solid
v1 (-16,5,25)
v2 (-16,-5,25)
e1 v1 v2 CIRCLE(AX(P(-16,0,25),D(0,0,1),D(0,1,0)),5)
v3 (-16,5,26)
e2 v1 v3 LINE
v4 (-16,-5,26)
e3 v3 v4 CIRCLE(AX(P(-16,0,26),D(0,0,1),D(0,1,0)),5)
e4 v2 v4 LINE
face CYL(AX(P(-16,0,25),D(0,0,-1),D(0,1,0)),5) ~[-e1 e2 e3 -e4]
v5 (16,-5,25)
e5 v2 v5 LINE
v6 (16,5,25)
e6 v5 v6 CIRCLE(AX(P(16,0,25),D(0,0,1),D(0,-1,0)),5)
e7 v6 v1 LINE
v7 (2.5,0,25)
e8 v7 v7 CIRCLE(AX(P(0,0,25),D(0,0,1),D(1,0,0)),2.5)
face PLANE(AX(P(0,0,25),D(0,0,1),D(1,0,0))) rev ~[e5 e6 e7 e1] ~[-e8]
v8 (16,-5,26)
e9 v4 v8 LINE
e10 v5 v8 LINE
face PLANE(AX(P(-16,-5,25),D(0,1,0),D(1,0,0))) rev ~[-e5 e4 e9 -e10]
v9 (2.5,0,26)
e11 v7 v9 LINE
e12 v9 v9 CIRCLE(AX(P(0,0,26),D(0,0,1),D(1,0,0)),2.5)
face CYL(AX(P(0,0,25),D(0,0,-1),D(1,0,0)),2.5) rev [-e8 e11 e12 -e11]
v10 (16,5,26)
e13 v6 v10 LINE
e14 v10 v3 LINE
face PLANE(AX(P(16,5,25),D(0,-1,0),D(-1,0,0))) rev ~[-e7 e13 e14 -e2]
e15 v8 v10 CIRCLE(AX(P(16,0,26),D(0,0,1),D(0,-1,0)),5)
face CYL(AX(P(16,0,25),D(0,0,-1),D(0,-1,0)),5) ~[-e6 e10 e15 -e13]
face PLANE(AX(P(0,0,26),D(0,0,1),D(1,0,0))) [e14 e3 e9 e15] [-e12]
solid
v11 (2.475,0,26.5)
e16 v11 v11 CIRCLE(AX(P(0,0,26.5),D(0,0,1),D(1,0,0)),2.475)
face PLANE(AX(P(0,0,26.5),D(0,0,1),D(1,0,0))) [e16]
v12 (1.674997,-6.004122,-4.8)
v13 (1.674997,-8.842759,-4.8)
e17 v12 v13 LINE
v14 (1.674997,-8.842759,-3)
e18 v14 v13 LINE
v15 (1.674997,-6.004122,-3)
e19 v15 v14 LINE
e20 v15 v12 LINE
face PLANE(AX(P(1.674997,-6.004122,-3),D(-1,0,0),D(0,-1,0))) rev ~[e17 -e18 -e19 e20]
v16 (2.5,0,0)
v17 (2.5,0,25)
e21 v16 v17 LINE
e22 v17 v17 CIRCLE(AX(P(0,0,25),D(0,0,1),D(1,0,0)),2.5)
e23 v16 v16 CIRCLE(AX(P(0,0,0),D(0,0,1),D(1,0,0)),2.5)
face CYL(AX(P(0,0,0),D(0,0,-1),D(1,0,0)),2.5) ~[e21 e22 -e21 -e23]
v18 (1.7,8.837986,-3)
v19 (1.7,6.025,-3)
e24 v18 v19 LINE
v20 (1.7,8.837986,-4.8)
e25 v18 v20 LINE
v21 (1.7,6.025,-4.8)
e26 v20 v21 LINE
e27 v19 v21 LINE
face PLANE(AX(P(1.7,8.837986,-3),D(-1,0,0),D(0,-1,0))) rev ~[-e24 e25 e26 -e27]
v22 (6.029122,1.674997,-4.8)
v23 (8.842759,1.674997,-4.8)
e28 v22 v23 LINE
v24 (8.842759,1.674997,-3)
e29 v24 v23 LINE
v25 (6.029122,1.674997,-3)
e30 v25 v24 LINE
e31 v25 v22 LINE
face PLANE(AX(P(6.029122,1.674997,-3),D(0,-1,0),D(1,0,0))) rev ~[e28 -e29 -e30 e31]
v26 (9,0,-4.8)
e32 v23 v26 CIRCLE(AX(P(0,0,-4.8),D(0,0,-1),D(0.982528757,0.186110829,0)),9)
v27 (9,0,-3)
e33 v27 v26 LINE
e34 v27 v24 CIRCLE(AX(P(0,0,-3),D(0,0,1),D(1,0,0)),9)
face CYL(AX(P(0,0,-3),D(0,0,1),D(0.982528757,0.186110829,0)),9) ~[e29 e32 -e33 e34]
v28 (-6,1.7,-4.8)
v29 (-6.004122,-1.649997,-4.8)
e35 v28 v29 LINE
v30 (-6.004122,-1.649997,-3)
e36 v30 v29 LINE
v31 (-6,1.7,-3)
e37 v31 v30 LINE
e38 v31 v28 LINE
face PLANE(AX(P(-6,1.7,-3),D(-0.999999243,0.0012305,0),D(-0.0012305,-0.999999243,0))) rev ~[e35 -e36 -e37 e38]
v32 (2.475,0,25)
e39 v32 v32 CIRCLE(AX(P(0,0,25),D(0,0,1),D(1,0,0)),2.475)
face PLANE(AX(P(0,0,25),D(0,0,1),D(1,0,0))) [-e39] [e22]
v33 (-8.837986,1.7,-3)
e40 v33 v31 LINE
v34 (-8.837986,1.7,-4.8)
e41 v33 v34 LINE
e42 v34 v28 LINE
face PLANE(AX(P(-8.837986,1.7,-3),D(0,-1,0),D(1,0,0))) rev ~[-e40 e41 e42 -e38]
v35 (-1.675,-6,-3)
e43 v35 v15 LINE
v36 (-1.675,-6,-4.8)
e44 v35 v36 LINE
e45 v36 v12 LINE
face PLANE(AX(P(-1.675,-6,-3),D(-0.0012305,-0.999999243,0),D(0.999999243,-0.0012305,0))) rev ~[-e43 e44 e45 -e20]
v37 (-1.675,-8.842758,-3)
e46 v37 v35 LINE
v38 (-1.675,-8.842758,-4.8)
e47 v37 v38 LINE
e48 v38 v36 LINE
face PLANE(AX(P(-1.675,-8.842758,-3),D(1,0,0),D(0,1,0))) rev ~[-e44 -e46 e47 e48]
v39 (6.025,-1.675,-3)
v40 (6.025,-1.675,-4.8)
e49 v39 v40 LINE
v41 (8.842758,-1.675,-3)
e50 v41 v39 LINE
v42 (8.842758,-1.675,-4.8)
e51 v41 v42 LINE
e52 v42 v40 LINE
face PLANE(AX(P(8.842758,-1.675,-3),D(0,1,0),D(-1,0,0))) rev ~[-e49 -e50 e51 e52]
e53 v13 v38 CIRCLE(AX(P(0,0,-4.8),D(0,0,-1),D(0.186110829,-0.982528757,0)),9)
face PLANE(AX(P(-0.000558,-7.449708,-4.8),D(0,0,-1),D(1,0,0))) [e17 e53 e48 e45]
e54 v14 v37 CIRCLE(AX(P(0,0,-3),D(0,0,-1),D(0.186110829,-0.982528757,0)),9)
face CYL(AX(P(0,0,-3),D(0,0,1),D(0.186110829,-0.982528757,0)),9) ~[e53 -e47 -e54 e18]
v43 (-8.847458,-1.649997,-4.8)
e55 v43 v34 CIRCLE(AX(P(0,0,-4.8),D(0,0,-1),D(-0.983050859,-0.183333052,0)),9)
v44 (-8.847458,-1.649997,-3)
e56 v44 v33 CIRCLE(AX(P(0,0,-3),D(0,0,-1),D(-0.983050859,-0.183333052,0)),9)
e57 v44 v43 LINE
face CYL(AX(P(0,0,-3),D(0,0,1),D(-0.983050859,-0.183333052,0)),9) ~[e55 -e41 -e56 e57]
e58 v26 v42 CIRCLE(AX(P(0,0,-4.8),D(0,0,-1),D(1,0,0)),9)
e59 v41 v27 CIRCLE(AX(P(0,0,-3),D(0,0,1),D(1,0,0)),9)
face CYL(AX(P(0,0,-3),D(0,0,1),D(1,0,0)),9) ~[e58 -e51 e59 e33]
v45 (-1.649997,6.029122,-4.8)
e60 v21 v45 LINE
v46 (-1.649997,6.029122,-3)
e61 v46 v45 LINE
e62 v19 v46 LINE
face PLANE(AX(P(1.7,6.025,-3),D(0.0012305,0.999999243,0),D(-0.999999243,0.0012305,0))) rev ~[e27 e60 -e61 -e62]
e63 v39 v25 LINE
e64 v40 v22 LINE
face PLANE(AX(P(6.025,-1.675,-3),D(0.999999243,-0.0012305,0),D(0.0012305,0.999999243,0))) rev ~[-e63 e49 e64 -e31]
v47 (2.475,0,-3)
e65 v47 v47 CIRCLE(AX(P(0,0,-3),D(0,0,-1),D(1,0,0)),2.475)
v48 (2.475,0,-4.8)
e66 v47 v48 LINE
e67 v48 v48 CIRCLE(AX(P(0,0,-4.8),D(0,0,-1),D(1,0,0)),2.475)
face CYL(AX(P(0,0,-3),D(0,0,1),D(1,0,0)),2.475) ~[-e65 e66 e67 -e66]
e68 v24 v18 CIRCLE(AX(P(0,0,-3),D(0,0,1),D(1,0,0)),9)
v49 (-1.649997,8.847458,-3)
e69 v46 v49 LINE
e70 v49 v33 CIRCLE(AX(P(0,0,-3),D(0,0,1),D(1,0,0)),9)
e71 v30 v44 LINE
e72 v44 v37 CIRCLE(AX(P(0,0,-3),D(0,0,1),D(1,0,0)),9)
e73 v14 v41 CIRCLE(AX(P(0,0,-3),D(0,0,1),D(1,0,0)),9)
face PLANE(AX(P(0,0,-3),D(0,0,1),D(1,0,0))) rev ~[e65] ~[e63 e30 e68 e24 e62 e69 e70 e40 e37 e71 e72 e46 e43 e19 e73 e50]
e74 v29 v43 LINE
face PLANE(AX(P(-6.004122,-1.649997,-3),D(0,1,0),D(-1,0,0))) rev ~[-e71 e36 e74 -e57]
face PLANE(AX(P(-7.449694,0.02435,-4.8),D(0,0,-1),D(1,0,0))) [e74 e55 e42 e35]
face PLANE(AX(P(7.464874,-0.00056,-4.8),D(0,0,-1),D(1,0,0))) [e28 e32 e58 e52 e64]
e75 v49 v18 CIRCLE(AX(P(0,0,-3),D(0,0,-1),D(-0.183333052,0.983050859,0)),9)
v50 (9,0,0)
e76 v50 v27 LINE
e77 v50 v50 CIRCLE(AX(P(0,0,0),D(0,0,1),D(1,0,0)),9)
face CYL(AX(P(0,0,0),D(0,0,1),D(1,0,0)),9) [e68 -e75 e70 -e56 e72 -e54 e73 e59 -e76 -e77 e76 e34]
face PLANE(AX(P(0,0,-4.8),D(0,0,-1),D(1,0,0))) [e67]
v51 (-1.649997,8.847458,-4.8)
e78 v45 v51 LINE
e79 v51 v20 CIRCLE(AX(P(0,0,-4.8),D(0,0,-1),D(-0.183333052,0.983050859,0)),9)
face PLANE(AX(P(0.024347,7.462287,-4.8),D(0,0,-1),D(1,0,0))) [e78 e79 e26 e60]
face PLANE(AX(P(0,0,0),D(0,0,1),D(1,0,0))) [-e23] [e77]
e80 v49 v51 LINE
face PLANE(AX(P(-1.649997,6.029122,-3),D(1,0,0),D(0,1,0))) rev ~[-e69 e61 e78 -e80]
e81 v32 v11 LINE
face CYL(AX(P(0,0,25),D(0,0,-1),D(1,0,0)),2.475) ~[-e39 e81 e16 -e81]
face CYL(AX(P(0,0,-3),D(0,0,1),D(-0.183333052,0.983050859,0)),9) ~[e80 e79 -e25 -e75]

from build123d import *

# Parameters (mm, degrees)
F0_R     = 2.5
F1_DEPTH = 25
F0_R_2   = 9
F0_R_3   = 5
F2_DEPTH = 3
F3_R     = 2.475
F4_DEPTH = 1.8
F5_R     = 2.475
F6_DEPTH = 1.5
F5_R_2   = 4
F5_R_3   = 2.5
F7_DEPTH = 1


# Not quite as in the source:
# - after a boolean that leaves OpenCascade's solid faulty, fix() repairs it


with BuildPart() as f1:
    # F0 (on Top) → F1 (new body)
    with BuildSketch(Plane.XY):
        Circle(F0_R)
    extrude(amount=F1_DEPTH)

    # F0 (on Top) → F2 (join)
    with BuildSketch(Plane.XY):
        Circle(F0_R_2)
        Circle(F0_R_3, mode=Mode.SUBTRACT)
        Circle(F0_R_3)
        Circle(F0_R, mode=Mode.SUBTRACT)
        Circle(F0_R)
    extrude(amount=-F2_DEPTH)

    # F3 (on face) → F4 (join)
    with BuildSketch(Plane(origin=(0, 0, -3), x_dir=(1, 0, 0), z_dir=(0, 0, -1))):
        Circle(F3_R)
        with BuildLine():
            Line((-6.0041221744, 1.6499974638), (-8.8474577348, 1.6499974638))
            ThreePointArc((-8.8474577348, 1.6499974638), (-8.9999640282, -0.0254458428), (-8.837986196, -1.7))
            Line((-8.837986196, -1.7), (-6, -1.7))
            Line((-6, -1.7), (-6.0041221744, 1.6499974638))
        make_face()
        with BuildLine():
            Line((-1.675, 8.8427583366), (-1.675, 6))
            Line((-1.675, 6), (1.6749974638, 6.0041221744))
            Line((1.6749974638, 6.0041221744), (1.6749974638, 8.842758817))
            ThreePointArc((1.6749974638, 8.842758817), (-1.2906e-06, 9), (-1.675, 8.8427583366))
        make_face()
        with BuildLine():
            ThreePointArc((9, 0), (8.9606033566, 0.841182195), (8.8427583366, 1.675))
            Line((8.8427583366, 1.675), (6.025, 1.675))
            Line((6.025, 1.675), (6.0291221744, -1.6749974638))
            Line((6.0291221744, -1.6749974638), (8.842758817, -1.6749974638))
            ThreePointArc((8.842758817, -1.6749974638), (8.9606034773, -0.84118091), (9, 0))
        make_face()
        with BuildLine():
            Line((-1.6499974638, -6.0291221744), (-1.6499974638, -8.8474577348))
            ThreePointArc((-1.6499974638, -8.8474577348), (0.0254458428, -8.9999640282), (1.7, -8.837986196))
            Line((1.7, -8.837986196), (1.7, -6.025))
            Line((1.7, -6.025), (-1.6499974638, -6.0291221744))
        make_face()
    extrude(amount=F4_DEPTH)

    add(f1.part.fix(), mode=Mode.REPLACE)

    # F5 (on face) → F6 (join)
    with BuildSketch(Plane.XY.offset(25)):
        Circle(F5_R)
    extrude(amount=F6_DEPTH)


with BuildPart() as f7:
    # F5 (on face) → F7 (new body)
    with BuildSketch(Plane.XY.offset(25)):
        with BuildLine():
            Line((16, 5), (-16, 5))
            ThreePointArc((-16, 5), (-21, 0), (-16, -5))
            Line((-16, -5), (16, -5))
            ThreePointArc((16, -5), (21, 0), (16, 5))
        make_face()
        Circle(F5_R_2, mode=Mode.SUBTRACT)
        Circle(F5_R_2)
        Circle(F5_R_3, mode=Mode.SUBTRACT)
    extrude(amount=F7_DEPTH)


solid = Compound([f1.part, f7.part])
